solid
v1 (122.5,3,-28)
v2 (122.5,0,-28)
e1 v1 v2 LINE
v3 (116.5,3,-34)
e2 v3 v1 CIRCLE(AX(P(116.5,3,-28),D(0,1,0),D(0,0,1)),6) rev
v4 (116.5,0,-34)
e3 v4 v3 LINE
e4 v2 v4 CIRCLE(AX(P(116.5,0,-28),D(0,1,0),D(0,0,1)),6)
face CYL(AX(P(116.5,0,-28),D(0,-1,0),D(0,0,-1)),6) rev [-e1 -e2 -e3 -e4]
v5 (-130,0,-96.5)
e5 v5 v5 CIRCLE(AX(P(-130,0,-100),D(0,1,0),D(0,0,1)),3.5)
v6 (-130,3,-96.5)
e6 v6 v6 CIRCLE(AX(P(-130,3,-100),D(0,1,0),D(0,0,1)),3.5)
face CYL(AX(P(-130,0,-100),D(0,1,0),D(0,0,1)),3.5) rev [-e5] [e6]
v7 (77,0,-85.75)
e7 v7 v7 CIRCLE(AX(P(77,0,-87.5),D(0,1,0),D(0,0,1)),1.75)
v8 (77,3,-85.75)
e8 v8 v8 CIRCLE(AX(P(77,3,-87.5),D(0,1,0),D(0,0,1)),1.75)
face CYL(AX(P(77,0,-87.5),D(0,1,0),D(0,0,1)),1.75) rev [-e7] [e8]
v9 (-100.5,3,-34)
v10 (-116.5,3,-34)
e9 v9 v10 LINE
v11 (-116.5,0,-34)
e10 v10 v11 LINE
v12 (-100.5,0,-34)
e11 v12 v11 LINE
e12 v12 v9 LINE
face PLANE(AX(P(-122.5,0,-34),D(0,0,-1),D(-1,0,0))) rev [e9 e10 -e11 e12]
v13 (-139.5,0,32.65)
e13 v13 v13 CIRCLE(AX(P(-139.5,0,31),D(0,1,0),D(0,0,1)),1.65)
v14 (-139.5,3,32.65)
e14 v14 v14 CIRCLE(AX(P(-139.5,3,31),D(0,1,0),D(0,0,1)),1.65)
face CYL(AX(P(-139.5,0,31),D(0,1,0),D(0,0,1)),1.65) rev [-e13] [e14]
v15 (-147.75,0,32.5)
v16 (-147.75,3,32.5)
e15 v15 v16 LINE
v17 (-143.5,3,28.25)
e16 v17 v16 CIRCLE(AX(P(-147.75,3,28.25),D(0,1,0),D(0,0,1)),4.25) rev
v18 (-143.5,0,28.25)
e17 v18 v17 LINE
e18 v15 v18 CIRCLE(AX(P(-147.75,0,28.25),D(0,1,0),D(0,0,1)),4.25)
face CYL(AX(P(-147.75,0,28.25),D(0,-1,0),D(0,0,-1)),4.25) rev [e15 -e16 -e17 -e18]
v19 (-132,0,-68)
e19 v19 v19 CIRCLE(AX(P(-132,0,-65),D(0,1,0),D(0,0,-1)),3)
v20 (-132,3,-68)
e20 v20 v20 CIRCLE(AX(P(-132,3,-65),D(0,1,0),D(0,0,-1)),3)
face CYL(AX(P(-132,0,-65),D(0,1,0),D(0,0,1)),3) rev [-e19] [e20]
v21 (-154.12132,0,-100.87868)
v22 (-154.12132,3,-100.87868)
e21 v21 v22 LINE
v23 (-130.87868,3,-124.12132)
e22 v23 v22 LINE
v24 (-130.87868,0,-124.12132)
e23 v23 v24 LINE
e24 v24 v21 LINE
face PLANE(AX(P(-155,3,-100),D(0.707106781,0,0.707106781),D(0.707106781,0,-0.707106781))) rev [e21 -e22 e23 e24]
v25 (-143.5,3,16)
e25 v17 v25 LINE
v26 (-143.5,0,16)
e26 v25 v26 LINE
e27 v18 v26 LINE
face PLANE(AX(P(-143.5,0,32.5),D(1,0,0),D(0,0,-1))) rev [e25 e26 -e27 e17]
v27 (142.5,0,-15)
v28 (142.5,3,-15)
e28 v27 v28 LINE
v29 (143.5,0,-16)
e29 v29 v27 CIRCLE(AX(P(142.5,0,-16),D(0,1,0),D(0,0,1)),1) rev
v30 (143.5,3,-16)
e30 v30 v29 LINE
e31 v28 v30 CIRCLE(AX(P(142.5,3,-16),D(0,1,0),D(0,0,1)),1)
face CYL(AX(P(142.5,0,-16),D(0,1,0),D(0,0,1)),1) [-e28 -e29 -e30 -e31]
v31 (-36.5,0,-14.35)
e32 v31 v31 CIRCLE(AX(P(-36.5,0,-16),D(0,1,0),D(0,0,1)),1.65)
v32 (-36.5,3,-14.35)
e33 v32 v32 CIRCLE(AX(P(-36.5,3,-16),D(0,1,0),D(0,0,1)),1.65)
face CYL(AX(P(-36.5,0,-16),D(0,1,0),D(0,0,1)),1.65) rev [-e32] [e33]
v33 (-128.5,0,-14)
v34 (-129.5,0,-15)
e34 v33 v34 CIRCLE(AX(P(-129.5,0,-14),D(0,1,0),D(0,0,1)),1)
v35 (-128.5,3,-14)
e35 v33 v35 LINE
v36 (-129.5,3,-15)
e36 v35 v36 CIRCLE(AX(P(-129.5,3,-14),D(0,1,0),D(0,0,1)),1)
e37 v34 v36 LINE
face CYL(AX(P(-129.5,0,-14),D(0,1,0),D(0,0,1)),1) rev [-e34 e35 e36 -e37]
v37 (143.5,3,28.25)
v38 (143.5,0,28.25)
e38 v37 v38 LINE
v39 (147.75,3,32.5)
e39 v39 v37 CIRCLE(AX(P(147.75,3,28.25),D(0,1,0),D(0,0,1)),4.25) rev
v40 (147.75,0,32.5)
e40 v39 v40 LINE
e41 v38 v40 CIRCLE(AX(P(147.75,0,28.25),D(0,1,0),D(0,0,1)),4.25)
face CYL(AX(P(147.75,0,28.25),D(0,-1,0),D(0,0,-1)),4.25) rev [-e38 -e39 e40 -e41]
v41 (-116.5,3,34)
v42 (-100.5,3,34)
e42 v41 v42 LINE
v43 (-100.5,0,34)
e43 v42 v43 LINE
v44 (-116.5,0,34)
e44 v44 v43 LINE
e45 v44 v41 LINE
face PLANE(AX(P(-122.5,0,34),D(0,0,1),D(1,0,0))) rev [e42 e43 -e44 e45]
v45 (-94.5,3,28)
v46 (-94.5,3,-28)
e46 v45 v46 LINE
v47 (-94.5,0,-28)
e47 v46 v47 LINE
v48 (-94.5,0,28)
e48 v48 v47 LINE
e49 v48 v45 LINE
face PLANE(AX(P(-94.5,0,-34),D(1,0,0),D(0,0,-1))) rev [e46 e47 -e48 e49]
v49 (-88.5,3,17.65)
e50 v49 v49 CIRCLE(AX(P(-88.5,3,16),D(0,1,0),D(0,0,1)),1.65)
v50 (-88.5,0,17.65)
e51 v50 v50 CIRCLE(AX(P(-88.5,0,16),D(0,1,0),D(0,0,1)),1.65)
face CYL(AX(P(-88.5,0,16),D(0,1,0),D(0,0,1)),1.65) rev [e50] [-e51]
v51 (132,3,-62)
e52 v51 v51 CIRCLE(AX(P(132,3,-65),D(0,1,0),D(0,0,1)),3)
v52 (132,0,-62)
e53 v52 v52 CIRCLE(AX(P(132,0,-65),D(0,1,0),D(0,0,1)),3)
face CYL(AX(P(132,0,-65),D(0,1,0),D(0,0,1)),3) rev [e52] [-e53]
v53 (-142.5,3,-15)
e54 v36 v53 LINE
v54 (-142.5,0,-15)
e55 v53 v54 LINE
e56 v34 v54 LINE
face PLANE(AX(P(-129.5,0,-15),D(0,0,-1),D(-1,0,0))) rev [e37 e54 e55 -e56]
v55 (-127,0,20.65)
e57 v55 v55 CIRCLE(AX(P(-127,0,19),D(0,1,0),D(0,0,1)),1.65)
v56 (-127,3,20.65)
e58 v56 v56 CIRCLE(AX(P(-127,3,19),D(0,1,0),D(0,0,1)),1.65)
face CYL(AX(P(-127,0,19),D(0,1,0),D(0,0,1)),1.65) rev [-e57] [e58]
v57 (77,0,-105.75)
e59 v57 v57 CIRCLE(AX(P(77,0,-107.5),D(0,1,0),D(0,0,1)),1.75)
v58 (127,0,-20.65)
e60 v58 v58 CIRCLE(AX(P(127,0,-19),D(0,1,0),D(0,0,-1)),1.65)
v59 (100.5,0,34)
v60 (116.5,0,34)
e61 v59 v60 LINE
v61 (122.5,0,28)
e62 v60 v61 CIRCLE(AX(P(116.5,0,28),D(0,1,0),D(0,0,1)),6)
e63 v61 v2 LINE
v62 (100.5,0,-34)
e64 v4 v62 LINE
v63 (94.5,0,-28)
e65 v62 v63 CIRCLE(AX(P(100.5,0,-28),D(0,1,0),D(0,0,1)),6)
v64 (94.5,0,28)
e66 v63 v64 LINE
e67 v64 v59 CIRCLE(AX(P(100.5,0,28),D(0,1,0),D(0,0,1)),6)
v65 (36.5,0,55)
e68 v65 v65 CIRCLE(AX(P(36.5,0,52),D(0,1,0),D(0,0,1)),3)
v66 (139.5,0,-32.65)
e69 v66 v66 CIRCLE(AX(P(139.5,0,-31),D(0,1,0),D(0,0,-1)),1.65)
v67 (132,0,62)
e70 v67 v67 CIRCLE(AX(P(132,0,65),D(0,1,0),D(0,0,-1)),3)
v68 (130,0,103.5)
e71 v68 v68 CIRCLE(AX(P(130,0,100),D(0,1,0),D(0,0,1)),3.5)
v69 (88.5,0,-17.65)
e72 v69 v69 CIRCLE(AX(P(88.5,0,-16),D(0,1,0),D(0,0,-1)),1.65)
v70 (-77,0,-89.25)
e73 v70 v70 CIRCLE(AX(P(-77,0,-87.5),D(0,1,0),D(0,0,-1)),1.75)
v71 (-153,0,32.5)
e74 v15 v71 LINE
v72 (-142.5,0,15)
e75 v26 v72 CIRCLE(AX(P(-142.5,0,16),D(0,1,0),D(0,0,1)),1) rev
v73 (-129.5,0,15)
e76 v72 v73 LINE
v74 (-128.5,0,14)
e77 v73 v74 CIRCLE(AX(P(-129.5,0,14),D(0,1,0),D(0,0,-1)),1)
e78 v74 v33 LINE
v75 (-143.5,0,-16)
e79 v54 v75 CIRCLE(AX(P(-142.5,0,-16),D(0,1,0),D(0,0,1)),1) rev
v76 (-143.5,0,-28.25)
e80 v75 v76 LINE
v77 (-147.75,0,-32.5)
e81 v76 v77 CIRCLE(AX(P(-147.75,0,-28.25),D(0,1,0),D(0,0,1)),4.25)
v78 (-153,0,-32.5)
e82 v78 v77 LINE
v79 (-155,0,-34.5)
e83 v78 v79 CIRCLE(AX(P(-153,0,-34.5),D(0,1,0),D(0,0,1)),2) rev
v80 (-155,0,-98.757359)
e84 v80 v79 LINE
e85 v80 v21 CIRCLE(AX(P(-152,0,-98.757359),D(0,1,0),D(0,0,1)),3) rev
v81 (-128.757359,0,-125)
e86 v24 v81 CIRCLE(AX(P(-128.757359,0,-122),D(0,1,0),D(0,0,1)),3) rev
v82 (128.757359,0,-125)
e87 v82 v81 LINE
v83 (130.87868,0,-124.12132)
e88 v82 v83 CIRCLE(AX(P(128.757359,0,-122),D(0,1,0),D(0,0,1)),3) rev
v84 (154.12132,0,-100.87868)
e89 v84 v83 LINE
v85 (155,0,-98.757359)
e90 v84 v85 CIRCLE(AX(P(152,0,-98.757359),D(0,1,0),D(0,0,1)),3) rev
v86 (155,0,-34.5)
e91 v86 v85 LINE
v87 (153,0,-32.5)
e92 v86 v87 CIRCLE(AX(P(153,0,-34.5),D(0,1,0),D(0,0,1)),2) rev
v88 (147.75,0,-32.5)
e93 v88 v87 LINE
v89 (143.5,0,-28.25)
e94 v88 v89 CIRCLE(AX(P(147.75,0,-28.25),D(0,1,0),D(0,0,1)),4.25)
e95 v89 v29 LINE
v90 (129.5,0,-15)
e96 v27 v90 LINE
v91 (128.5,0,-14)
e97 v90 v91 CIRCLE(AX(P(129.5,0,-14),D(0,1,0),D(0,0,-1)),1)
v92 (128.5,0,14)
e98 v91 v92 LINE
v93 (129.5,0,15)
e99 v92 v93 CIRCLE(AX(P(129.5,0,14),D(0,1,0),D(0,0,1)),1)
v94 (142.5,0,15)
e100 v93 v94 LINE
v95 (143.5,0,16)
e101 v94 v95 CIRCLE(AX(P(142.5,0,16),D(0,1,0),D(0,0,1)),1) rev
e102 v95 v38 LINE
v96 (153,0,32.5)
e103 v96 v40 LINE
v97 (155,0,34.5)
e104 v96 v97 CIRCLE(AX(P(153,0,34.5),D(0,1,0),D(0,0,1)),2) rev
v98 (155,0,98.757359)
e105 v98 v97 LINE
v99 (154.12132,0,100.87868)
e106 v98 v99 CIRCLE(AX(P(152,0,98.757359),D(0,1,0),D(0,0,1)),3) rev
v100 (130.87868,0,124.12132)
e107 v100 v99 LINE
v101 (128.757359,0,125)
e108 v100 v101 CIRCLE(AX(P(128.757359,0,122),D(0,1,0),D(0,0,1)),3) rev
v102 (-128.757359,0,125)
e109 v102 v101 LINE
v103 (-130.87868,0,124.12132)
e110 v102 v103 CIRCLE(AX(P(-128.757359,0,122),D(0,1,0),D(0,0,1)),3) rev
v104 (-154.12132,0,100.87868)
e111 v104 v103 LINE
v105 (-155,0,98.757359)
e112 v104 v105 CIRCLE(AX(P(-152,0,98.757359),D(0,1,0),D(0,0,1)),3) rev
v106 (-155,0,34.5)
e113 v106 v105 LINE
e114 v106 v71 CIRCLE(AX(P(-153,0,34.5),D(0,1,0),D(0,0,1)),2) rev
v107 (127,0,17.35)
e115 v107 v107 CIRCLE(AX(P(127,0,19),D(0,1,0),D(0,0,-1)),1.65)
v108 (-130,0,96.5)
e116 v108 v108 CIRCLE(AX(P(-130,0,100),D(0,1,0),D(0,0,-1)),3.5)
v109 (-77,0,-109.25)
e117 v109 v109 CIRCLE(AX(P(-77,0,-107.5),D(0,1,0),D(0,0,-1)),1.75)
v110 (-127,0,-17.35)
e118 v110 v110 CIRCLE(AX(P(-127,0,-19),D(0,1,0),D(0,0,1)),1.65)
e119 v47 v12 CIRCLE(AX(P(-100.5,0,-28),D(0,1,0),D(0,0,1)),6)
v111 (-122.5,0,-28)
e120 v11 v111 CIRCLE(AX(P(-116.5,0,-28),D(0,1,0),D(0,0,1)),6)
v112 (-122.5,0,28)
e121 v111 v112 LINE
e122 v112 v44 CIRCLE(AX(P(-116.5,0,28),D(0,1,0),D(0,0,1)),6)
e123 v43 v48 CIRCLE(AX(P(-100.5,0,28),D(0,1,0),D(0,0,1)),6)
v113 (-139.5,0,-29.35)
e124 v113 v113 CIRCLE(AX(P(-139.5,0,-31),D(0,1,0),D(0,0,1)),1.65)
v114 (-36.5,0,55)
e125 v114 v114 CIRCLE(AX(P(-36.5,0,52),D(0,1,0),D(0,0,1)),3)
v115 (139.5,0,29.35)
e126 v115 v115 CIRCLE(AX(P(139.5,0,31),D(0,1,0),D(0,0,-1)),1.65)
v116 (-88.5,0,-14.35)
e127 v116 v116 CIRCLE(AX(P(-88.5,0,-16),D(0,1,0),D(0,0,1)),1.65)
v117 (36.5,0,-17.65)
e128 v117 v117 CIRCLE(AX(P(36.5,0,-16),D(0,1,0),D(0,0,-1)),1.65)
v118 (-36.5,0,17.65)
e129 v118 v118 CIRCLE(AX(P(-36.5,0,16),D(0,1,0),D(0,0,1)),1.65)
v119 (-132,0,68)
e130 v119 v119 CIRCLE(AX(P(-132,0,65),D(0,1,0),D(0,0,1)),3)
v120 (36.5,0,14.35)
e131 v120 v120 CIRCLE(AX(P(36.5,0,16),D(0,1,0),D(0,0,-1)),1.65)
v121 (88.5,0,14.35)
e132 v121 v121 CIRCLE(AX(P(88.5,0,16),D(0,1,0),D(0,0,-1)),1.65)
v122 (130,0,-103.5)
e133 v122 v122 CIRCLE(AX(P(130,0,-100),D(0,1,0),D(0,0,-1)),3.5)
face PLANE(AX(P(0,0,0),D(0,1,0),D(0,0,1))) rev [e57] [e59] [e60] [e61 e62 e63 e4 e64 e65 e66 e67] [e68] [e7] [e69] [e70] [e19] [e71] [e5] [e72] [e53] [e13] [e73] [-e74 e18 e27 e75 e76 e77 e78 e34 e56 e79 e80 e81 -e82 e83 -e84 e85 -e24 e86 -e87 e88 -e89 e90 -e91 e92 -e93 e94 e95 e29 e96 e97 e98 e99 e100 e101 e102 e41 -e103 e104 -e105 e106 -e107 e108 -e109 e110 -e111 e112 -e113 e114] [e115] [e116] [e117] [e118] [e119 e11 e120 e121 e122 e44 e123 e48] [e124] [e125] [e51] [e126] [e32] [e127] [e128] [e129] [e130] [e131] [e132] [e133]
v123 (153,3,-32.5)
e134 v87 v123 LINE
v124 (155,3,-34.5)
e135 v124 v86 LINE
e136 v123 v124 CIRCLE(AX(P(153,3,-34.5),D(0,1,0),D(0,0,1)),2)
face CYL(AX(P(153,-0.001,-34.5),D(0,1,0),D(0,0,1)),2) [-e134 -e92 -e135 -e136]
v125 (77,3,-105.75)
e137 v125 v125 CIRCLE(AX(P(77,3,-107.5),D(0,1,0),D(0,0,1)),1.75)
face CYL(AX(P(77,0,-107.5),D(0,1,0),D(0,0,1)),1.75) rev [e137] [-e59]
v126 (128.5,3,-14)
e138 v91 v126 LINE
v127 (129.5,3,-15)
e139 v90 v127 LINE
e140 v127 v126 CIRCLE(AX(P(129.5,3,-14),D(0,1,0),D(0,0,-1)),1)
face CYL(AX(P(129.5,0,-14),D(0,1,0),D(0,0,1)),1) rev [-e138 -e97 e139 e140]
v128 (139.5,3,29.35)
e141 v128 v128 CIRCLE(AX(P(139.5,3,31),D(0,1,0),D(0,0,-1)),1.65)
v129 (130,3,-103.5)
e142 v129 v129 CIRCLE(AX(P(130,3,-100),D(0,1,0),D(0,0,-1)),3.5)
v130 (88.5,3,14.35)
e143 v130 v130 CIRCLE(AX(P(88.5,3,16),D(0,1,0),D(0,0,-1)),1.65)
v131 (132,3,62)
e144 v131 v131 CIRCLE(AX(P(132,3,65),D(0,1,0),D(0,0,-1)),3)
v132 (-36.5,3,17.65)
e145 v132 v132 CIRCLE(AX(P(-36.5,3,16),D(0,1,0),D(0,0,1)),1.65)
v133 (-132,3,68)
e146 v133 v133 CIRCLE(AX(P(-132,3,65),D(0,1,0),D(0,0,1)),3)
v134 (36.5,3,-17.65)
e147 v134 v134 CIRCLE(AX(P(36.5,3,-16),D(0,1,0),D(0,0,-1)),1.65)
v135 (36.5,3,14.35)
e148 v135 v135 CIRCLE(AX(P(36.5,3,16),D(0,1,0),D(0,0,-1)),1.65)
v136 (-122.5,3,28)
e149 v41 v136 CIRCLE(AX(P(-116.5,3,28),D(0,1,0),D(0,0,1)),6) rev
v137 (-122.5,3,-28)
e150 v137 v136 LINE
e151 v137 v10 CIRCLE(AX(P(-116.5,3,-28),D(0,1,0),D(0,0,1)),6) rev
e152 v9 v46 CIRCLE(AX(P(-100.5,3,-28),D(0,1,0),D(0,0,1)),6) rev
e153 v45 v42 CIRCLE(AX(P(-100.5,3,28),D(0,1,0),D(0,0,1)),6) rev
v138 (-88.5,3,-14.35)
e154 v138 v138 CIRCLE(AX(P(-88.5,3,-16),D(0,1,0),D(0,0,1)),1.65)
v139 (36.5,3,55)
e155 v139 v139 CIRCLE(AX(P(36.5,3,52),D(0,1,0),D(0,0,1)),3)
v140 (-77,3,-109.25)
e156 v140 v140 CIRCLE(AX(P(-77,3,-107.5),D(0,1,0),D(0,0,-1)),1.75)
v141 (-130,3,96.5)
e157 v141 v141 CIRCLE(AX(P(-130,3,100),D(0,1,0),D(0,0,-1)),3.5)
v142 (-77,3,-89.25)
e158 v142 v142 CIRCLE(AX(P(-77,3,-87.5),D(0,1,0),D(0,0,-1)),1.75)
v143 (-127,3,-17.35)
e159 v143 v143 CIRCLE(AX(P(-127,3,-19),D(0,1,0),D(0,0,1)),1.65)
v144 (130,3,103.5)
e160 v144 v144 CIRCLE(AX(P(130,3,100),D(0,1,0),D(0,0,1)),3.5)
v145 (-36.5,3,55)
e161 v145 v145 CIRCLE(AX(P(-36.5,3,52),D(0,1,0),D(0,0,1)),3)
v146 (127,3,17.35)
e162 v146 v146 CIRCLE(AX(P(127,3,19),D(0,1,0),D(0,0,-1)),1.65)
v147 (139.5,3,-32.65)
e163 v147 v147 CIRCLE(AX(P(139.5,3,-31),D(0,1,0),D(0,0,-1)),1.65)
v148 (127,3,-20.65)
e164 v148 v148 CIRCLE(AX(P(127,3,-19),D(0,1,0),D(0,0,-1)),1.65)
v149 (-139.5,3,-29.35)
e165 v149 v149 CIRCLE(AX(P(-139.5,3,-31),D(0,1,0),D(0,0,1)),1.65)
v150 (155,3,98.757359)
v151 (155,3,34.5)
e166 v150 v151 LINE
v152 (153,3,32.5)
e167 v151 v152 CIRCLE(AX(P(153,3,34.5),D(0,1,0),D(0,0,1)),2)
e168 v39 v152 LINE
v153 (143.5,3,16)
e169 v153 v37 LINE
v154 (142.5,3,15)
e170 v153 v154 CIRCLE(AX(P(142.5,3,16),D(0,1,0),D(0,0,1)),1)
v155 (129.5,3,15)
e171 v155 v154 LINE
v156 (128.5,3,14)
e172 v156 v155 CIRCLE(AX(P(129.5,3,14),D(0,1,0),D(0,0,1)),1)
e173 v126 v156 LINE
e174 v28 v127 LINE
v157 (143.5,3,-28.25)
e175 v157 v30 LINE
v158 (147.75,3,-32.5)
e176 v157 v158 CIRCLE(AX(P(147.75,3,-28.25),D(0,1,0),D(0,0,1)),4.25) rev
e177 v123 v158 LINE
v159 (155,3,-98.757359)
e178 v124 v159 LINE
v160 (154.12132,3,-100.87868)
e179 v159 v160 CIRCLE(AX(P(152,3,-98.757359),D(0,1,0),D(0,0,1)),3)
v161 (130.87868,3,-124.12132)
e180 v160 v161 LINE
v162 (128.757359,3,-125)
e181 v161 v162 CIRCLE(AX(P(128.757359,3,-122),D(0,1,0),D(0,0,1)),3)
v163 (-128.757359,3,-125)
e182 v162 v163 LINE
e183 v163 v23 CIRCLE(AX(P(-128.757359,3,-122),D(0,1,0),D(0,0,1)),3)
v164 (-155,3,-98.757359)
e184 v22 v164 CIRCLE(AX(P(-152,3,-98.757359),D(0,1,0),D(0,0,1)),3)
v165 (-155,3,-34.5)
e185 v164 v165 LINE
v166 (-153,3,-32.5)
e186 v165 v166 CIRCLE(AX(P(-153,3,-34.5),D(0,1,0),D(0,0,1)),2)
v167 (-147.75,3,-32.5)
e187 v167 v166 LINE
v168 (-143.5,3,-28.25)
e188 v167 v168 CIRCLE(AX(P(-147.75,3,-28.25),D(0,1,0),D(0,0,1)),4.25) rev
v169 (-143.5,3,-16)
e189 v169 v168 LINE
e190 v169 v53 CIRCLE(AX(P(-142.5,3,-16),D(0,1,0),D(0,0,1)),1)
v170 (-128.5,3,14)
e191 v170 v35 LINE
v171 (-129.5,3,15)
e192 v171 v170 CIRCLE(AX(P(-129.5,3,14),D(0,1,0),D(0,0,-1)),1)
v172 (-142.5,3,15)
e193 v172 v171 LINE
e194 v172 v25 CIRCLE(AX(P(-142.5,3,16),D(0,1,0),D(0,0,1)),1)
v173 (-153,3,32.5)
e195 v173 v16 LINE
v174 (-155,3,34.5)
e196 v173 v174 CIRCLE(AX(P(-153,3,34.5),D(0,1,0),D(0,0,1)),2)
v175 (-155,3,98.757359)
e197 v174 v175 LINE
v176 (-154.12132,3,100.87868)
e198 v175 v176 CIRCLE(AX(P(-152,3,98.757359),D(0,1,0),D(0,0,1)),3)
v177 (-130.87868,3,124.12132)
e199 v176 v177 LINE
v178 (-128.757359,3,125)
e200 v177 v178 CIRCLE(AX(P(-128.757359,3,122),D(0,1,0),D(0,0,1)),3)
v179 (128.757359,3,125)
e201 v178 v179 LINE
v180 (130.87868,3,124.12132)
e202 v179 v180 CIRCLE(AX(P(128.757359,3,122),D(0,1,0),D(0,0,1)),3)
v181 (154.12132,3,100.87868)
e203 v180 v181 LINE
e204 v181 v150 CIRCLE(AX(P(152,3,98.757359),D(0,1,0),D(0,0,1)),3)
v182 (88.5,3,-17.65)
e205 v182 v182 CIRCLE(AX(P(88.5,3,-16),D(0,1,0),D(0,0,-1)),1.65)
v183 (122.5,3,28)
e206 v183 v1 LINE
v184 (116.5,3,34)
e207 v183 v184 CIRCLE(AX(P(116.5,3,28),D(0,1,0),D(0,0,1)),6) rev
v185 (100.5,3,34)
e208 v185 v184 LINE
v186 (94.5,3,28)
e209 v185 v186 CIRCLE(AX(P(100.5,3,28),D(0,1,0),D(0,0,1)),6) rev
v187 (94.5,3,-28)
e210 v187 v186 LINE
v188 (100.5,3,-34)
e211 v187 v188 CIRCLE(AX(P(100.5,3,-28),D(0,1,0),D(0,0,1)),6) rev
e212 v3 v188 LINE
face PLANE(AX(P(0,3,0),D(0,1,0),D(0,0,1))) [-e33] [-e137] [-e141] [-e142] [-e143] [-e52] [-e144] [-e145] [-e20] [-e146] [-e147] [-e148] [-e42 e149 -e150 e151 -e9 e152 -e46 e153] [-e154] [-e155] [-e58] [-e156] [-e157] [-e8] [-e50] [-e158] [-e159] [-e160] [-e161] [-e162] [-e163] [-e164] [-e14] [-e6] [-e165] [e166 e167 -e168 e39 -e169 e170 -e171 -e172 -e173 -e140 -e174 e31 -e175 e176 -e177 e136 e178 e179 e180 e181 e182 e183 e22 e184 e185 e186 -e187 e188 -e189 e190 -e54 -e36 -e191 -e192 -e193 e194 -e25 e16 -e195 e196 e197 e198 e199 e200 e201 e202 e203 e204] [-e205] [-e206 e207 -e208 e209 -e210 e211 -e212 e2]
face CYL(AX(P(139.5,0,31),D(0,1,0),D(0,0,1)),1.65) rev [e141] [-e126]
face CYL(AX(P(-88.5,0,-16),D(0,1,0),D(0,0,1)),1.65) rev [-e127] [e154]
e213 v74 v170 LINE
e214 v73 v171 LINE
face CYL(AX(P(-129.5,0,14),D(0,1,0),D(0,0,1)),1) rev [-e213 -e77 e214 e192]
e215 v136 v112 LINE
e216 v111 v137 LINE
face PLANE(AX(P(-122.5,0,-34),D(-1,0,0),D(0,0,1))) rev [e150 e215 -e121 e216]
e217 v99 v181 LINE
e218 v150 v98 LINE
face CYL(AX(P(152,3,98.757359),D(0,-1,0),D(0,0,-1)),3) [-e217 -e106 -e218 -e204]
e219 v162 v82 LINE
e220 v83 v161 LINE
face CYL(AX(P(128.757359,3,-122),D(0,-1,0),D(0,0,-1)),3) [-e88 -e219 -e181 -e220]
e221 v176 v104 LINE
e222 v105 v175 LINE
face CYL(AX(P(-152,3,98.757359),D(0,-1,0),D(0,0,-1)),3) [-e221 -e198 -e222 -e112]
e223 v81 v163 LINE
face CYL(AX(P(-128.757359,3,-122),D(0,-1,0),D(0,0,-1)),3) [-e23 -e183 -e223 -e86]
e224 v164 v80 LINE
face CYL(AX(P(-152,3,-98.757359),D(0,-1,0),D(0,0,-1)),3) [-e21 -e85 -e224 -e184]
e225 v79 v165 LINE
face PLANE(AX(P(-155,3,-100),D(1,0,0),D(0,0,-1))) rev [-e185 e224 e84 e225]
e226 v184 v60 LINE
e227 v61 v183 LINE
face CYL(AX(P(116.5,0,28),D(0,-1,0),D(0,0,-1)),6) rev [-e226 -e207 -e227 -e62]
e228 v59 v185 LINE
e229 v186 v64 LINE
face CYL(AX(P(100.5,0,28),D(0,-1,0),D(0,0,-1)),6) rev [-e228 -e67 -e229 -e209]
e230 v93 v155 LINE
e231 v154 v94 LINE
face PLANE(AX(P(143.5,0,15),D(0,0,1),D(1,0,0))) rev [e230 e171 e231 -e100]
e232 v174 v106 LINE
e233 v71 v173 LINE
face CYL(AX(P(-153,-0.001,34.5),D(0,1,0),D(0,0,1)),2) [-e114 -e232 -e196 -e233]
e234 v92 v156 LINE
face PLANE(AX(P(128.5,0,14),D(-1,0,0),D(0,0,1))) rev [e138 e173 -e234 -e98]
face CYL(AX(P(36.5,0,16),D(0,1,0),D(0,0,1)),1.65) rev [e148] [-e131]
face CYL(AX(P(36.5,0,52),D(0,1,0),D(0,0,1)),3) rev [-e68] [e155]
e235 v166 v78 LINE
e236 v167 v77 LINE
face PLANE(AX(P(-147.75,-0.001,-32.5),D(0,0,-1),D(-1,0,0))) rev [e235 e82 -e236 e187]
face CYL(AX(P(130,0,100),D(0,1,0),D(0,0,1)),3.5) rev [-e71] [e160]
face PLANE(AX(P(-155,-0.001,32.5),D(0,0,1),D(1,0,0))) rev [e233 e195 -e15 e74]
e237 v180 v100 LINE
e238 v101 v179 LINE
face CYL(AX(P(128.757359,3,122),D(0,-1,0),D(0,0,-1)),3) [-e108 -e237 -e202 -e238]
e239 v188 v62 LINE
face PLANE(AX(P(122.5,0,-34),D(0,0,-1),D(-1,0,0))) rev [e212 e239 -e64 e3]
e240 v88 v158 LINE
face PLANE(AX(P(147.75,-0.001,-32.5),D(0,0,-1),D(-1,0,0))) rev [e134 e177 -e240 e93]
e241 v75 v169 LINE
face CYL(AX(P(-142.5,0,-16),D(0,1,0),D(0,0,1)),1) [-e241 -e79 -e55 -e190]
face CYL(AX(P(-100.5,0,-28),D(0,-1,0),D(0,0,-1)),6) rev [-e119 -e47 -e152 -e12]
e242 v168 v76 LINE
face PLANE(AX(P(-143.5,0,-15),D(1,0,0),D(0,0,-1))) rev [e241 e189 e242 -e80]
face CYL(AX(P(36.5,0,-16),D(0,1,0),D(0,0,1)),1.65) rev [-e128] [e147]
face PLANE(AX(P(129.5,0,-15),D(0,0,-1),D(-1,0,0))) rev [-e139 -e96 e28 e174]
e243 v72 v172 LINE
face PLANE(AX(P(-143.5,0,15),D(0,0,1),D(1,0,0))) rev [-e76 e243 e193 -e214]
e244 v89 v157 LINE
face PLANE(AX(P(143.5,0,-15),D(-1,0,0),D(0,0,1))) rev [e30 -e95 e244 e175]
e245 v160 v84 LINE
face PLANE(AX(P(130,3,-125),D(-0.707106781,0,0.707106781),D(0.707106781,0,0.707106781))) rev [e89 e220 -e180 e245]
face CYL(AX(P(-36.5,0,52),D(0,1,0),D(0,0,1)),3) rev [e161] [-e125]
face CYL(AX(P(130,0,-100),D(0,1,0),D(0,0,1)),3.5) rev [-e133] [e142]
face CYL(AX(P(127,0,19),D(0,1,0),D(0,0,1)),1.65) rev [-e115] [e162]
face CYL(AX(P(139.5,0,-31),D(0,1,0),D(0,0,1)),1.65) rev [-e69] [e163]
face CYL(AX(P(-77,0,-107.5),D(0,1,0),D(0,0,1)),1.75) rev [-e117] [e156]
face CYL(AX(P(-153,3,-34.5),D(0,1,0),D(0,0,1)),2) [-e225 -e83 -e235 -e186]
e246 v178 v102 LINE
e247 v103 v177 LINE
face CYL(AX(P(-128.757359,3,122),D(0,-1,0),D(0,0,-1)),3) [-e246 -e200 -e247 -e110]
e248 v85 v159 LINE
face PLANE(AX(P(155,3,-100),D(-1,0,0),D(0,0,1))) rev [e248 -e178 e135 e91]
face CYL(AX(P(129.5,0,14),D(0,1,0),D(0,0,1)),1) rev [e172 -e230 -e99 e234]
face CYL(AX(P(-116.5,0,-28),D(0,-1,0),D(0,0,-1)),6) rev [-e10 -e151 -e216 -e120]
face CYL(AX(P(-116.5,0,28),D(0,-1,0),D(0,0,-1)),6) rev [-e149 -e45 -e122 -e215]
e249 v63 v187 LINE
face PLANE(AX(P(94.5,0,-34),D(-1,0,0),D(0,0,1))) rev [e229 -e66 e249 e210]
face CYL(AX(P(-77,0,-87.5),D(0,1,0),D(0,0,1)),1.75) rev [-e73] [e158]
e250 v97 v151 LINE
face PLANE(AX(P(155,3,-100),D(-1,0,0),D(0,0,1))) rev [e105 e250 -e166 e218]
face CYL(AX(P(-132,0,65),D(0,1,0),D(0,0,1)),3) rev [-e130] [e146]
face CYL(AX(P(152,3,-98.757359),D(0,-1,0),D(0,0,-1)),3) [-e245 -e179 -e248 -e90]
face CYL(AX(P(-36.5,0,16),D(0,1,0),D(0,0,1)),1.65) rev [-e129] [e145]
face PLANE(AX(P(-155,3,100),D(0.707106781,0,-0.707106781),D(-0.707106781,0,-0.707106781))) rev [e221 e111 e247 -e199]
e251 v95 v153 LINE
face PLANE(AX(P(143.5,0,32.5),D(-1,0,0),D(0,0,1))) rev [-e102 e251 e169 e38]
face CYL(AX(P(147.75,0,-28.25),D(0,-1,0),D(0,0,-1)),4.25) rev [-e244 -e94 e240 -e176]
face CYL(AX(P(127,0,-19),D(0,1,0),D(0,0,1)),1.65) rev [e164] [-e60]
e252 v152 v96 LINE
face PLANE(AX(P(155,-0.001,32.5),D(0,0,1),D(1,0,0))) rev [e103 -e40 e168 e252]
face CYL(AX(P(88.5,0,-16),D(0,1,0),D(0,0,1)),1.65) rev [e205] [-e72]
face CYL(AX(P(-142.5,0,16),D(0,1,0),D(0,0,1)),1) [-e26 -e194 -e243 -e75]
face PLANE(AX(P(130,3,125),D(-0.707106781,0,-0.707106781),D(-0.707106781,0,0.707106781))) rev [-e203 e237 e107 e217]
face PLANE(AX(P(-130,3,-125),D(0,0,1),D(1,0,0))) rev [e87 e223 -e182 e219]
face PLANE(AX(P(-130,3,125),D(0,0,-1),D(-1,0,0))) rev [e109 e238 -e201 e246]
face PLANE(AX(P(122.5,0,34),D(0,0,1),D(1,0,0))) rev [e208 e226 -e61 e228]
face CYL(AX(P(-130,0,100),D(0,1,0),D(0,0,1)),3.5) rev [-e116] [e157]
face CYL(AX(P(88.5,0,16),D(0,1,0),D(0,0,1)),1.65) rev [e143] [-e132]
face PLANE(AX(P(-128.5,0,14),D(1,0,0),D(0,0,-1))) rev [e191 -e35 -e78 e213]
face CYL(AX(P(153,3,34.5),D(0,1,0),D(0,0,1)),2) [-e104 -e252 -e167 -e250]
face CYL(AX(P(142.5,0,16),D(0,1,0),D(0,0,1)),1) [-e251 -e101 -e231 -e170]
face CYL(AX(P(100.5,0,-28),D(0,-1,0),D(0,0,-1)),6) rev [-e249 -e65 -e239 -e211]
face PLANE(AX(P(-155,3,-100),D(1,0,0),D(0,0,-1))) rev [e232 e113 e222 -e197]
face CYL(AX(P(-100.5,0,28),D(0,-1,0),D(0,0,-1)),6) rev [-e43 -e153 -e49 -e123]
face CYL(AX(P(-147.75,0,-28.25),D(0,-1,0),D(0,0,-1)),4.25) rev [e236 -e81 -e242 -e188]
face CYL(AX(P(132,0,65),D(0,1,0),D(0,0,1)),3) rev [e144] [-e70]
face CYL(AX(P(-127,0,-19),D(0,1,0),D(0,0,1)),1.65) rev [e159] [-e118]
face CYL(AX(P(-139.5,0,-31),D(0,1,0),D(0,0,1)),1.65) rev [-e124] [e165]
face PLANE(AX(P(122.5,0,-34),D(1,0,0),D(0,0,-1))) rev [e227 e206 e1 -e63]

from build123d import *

# Parameters (mm, degrees)
BOSS_EXTRU_1_DEPTH         = 3
CONG_1_R                   = 3
ESQUISSE2_R                = 3
PER_AGE_PROFIL_DEPTH       = 200.145675323
ESQUISSE3_R                = 1.65
PER_AGE_ENCODEUR_DEPTH     = 200.145675323
POCHE_ROUE_ENCODEUSE_DEPTH = 200.145675323
CONG_4_R                   = 1
CONG_2_R                   = 4.25
CONG_3_R                   = 4.25
ESQUISSE5_R                = 1.65
PER_AGE_BLOC_MOTEUR_DEPTH  = 200.145675323
ESQUISSE6_W                = 28
ESQUISSE6_H                = 68
POCHE_ROUE_MOTRICE_DEPTH   = 200.145675323
ESQUISSE7_R                = 3.5
PER_AGE_PATIN_DEPTH        = 200.145675323
ESQUISSE8_R                = 3
ENL_V_MAT_EXTRU_1_DEPTH    = 200.145675323
CONG_5_R                   = 6
ENL_V_MAT_EXTRU_2_REACH    = 201.146
ESQUISSE9_W                = 7.25
ESQUISSE9_H                = 65
CONG_6_R                   = 2
ESQUISSE10_R               = 1.75
ENL_V_MAT_EXTRU_3_DEPTH    = 200.145675323


with BuildPart() as part:
    # Esquisse1 → Boss.-Extru.1 (new body)
    with BuildSketch(Plane(origin=(0, 0, 0), x_dir=(1, 0, 0), z_dir=(0, 1, 0))):
        Polygon((-130, 125), (130, 125), (155, 100), (155, -100), (130, -125), (-130, -125), (-155, -100), (-155, 100), align=None)
    extrude(amount=BOSS_EXTRU_1_DEPTH)

    # Congé1
    cong_1_edges = [part.edges().sort_by_distance(p)[0] for p in [
        (155, 1.5, -100),
        (155, 1.5, 100),
        (130, 1.5, 125),
        (-130, 1.5, 125),
        (-155, 1.5, 100),
        (-155, 1.5, -100),
        (-130, 1.5, -125),
        (130, 1.5, -125),
    ]]
    fillet(cong_1_edges, radius=CONG_1_R)

    # Esquisse2 → Perçage Profilé (cut, through all)
    with BuildSketch(Plane(origin=(0, 3, 0), x_dir=(1, 0, 0), z_dir=(0, 1, 0))):
        with Locations(Location((-132, -65, 0), (0, 0, 270))):
            Circle(ESQUISSE2_R)
        with Locations(Location((-132, 65, 0), (0, 0, 90))):
            Circle(ESQUISSE2_R)
        with Locations(Location((132, -65, 0), (0, 0, 90))):
            Circle(ESQUISSE2_R)
        with Locations(Location((132, 65, 0), (0, 0, 270))):
            Circle(ESQUISSE2_R)
    extrude(amount=-PER_AGE_PROFIL_DEPTH, mode=Mode.SUBTRACT)

    # Esquisse3 → Perçage Encodeur (cut, through all)
    with BuildSketch(Plane(origin=(0, 3, 0), x_dir=(1, 0, 0), z_dir=(0, 1, 0))):
        with Locations(Location((-127, 19, 0), (0, 0, 270))):
            Circle(ESQUISSE3_R)
        with Locations(Location((-127, -19, 0), (0, 0, 270))):
            Circle(ESQUISSE3_R)
        with Locations(Location((127, -19, 0), (0, 0, 90))):
            Circle(ESQUISSE3_R)
        with Locations(Location((127, 19, 0), (0, 0, 90))):
            Circle(ESQUISSE3_R)
        with Locations(Location((-139.5, 31, 0), (0, 0, 270))):
            Circle(ESQUISSE3_R)
        with Locations(Location((-139.5, -31, 0), (0, 0, 270))):
            Circle(ESQUISSE3_R)
        with Locations(Location((139.5, -31, 0), (0, 0, 90))):
            Circle(ESQUISSE3_R)
        with Locations(Location((139.5, 31, 0), (0, 0, 90))):
            Circle(ESQUISSE3_R)
    extrude(amount=-PER_AGE_ENCODEUR_DEPTH, mode=Mode.SUBTRACT)

    # Esquisse4 → Poche Roue Encodeuse (cut, through all)
    with BuildSketch(Plane(origin=(0, 3, 0), x_dir=(1, 0, 0), z_dir=(0, 1, 0))):
        with BuildLine():
            Line((143.5, -15), (129.5, -15))
            ThreePointArc((129.5, -15), (128.792893219, -14.707106781), (128.5, -14))
            Line((128.5, -14), (128.5, 14))
            ThreePointArc((128.5, 14), (128.792893219, 14.707106781), (129.5, 15))
            Line((129.5, 15), (143.5, 15))
            Line((143.5, 15), (143.5, 32.5))
            Line((143.5, 32.5), (152, 32.5))
            Line((152, 32.5), (152, -32.5))
            Line((152, -32.5), (143.5, -32.5))
            Line((143.5, -32.5), (143.5, -15))
        make_face()
        with BuildLine():
            Line((-128.5, -14), (-128.5, 14))
            ThreePointArc((-128.5, 14), (-128.792893219, 14.707106781), (-129.5, 15))
            Line((-129.5, 15), (-143.5, 15))
            Line((-143.5, 15), (-143.5, 32.5))
            Line((-143.5, 32.5), (-152, 32.5))
            Line((-152, 32.5), (-152, -32.5))
            Line((-152, -32.5), (-143.5, -32.5))
            Line((-143.5, -32.5), (-143.5, -15))
            Line((-143.5, -15), (-129.5, -15))
            ThreePointArc((-129.5, -15), (-128.792893219, -14.707106781), (-128.5, -14))
        make_face()
    extrude(amount=-POCHE_ROUE_ENCODEUSE_DEPTH, mode=Mode.SUBTRACT)

    # Congé4
    cong_4_edges = [part.edges().sort_by_distance(p)[0] for p in [
        (-143.5, 1.5, 15),
        (-143.5, 1.5, -15),
        (143.5, 1.5, -15),
        (143.5, 1.5, 15),
    ]]
    fillet(cong_4_edges, radius=CONG_4_R)

    # Congé2
    cong_2_edges = [part.edges().sort_by_distance(p)[0] for p in [
        (-152, 1.5, 32.5),
        (-152, 1.5, -32.5),
        (152, 1.5, -32.5),
        (152, 1.5, 32.5),
    ]]
    fillet(cong_2_edges, radius=CONG_2_R)

    # Congé3
    cong_3_edges = [part.edges().sort_by_distance(p)[0] for p in [
        (143.5, 1.5, 32.5),
        (143.5, 1.5, -32.5),
        (-143.5, 1.5, 32.5),
        (-143.5, 1.5, -32.5),
    ]]
    fillet(cong_3_edges, radius=CONG_3_R - 0.0001)  # a hair under: the kernel refuses the full size

    # Esquisse5 → Perçage Bloc Moteur (cut, through all)
    with BuildSketch(Plane(origin=(0, 3, 0), x_dir=(1, 0, 0), z_dir=(0, 1, 0))):
        with Locations(Location((-88.5, 16, 0), (0, 0, 270))):
            Circle(ESQUISSE5_R)
        with Locations(Location((-88.5, -16, 0), (0, 0, 270))):
            Circle(ESQUISSE5_R)
        with Locations(Location((-36.5, -16, 0), (0, 0, 270))):
            Circle(ESQUISSE5_R)
        with Locations(Location((-36.5, 16, 0), (0, 0, 270))):
            Circle(ESQUISSE5_R)
        with Locations(Location((36.5, 16, 0), (0, 0, 90))):
            Circle(ESQUISSE5_R)
        with Locations(Location((36.5, -16, 0), (0, 0, 90))):
            Circle(ESQUISSE5_R)
        with Locations(Location((88.5, -16, 0), (0, 0, 90))):
            Circle(ESQUISSE5_R)
        with Locations(Location((88.5, 16, 0), (0, 0, 90))):
            Circle(ESQUISSE5_R)
    extrude(amount=-PER_AGE_BLOC_MOTEUR_DEPTH, mode=Mode.SUBTRACT)

    # Esquisse6 → Poche Roue Motrice (cut, through all)
    with BuildSketch(Plane(origin=(0, 3, 0), x_dir=(1, 0, 0), z_dir=(0, 1, 0))):
        with Locations((-108.5, 0)):
            Rectangle(ESQUISSE6_W, ESQUISSE6_H)
        with Locations((108.5, 0)):
            Rectangle(ESQUISSE6_W, ESQUISSE6_H)
    extrude(amount=-POCHE_ROUE_MOTRICE_DEPTH, mode=Mode.SUBTRACT)

    # Esquisse7 → Perçage Patin (cut, through all)
    with BuildSketch(Plane(origin=(0, 3, 0), x_dir=(1, 0, 0), z_dir=(0, 1, 0))):
        with Locations(Location((-130, 100, 0), (0, 0, 270))):
            Circle(ESQUISSE7_R)
        with Locations(Location((-130, -100, 0), (0, 0, 90))):
            Circle(ESQUISSE7_R)
        with Locations(Location((130, -100, 0), (0, 0, 270))):
            Circle(ESQUISSE7_R)
        with Locations(Location((130, 100, 0), (0, 0, 90))):
            Circle(ESQUISSE7_R)
    extrude(amount=-PER_AGE_PATIN_DEPTH, mode=Mode.SUBTRACT)

    # Esquisse8 → Enlèv. mat.-Extru.1 (cut, through all)
    with BuildSketch(Plane(origin=(0, 3, 0), x_dir=(1, 0, 0), z_dir=(0, 1, 0))):
        with Locations(Location((-36.5, -52, 0), (0, 0, 270))):
            Circle(ESQUISSE8_R)
        with Locations(Location((36.5, -52, 0), (0, 0, 270))):
            Circle(ESQUISSE8_R)
    extrude(amount=-ENL_V_MAT_EXTRU_1_DEPTH, mode=Mode.SUBTRACT)

    # Congé5
    cong_5_edges = [part.edges().sort_by_distance(p)[0] for p in [
        (-122.5, 1.5, 34),
        (-122.5, 1.5, -34),
        (-94.5, 1.5, -34),
        (-94.5, 1.5, 34),
        (122.5, 1.5, -34),
        (122.5, 1.5, 34),
        (94.5, 1.5, 34),
        (94.5, 1.5, -34),
    ]]
    fillet(cong_5_edges, radius=CONG_5_R)

    # Esquisse9 → Enlèv. mat.-Extru.2 (cut, up to next)
    with BuildSketch(Plane(origin=(0, 3, 0), x_dir=(1, 0, 0), z_dir=(0, 1, 0)), mode=Mode.PRIVATE) as enl_v_mat_extru_2_sk1:
        with Locations((-151.375, 0)):
            Rectangle(ESQUISSE9_W, ESQUISSE9_H)
    enl_v_mat_extru_2_tool1 = extrude(enl_v_mat_extru_2_sk1.sketch, amount=-ENL_V_MAT_EXTRU_2_REACH, mode=Mode.PRIVATE) & part.part
    # Esquisse9 → Enlèv. mat.-Extru.2 (cut, up to next)
    with BuildSketch(Plane(origin=(0, 3, 0), x_dir=(1, 0, 0), z_dir=(0, 1, 0)), mode=Mode.PRIVATE) as enl_v_mat_extru_2_sk2:
        with Locations((151.375, 0)):
            Rectangle(ESQUISSE9_W, ESQUISSE9_H)
    enl_v_mat_extru_2_tool2 = extrude(enl_v_mat_extru_2_sk2.sketch, amount=-ENL_V_MAT_EXTRU_2_REACH, mode=Mode.PRIVATE) & part.part
    add(enl_v_mat_extru_2_tool1.solids().sort_by_distance((-151.375, 3, 0))[0], mode=Mode.SUBTRACT)
    add(enl_v_mat_extru_2_tool2.solids().sort_by_distance((151.375, 3, 0))[0], mode=Mode.SUBTRACT)

    # Congé6
    cong_6_edges = [part.edges().sort_by_distance(p)[0] for p in [
        (-155, 1.5, 32.5),
        (-155, 1.5, -32.5),
        (155, 1.5, -32.5),
        (155, 1.5, 32.5),
    ]]
    fillet(cong_6_edges, radius=CONG_6_R)

    # Esquisse10 → Enlèv. mat.-Extru.3 (cut, through all)
    with BuildSketch(Plane(origin=(0, 3, 0), x_dir=(1, 0, 0), z_dir=(0, 1, 0))):
        with Locations(Location((77, 107.5, 0), (0, 0, 270))):
            Circle(ESQUISSE10_R)
        with Locations(Location((77, 87.5, 0), (0, 0, 270))):
            Circle(ESQUISSE10_R)
        with Locations(Location((-77, 87.5, 0), (0, 0, 90))):
            Circle(ESQUISSE10_R)
        with Locations(Location((-77, 107.5, 0), (0, 0, 90))):
            Circle(ESQUISSE10_R)
    extrude(amount=-ENL_V_MAT_EXTRU_3_DEPTH, mode=Mode.SUBTRACT)


solid = part.part
